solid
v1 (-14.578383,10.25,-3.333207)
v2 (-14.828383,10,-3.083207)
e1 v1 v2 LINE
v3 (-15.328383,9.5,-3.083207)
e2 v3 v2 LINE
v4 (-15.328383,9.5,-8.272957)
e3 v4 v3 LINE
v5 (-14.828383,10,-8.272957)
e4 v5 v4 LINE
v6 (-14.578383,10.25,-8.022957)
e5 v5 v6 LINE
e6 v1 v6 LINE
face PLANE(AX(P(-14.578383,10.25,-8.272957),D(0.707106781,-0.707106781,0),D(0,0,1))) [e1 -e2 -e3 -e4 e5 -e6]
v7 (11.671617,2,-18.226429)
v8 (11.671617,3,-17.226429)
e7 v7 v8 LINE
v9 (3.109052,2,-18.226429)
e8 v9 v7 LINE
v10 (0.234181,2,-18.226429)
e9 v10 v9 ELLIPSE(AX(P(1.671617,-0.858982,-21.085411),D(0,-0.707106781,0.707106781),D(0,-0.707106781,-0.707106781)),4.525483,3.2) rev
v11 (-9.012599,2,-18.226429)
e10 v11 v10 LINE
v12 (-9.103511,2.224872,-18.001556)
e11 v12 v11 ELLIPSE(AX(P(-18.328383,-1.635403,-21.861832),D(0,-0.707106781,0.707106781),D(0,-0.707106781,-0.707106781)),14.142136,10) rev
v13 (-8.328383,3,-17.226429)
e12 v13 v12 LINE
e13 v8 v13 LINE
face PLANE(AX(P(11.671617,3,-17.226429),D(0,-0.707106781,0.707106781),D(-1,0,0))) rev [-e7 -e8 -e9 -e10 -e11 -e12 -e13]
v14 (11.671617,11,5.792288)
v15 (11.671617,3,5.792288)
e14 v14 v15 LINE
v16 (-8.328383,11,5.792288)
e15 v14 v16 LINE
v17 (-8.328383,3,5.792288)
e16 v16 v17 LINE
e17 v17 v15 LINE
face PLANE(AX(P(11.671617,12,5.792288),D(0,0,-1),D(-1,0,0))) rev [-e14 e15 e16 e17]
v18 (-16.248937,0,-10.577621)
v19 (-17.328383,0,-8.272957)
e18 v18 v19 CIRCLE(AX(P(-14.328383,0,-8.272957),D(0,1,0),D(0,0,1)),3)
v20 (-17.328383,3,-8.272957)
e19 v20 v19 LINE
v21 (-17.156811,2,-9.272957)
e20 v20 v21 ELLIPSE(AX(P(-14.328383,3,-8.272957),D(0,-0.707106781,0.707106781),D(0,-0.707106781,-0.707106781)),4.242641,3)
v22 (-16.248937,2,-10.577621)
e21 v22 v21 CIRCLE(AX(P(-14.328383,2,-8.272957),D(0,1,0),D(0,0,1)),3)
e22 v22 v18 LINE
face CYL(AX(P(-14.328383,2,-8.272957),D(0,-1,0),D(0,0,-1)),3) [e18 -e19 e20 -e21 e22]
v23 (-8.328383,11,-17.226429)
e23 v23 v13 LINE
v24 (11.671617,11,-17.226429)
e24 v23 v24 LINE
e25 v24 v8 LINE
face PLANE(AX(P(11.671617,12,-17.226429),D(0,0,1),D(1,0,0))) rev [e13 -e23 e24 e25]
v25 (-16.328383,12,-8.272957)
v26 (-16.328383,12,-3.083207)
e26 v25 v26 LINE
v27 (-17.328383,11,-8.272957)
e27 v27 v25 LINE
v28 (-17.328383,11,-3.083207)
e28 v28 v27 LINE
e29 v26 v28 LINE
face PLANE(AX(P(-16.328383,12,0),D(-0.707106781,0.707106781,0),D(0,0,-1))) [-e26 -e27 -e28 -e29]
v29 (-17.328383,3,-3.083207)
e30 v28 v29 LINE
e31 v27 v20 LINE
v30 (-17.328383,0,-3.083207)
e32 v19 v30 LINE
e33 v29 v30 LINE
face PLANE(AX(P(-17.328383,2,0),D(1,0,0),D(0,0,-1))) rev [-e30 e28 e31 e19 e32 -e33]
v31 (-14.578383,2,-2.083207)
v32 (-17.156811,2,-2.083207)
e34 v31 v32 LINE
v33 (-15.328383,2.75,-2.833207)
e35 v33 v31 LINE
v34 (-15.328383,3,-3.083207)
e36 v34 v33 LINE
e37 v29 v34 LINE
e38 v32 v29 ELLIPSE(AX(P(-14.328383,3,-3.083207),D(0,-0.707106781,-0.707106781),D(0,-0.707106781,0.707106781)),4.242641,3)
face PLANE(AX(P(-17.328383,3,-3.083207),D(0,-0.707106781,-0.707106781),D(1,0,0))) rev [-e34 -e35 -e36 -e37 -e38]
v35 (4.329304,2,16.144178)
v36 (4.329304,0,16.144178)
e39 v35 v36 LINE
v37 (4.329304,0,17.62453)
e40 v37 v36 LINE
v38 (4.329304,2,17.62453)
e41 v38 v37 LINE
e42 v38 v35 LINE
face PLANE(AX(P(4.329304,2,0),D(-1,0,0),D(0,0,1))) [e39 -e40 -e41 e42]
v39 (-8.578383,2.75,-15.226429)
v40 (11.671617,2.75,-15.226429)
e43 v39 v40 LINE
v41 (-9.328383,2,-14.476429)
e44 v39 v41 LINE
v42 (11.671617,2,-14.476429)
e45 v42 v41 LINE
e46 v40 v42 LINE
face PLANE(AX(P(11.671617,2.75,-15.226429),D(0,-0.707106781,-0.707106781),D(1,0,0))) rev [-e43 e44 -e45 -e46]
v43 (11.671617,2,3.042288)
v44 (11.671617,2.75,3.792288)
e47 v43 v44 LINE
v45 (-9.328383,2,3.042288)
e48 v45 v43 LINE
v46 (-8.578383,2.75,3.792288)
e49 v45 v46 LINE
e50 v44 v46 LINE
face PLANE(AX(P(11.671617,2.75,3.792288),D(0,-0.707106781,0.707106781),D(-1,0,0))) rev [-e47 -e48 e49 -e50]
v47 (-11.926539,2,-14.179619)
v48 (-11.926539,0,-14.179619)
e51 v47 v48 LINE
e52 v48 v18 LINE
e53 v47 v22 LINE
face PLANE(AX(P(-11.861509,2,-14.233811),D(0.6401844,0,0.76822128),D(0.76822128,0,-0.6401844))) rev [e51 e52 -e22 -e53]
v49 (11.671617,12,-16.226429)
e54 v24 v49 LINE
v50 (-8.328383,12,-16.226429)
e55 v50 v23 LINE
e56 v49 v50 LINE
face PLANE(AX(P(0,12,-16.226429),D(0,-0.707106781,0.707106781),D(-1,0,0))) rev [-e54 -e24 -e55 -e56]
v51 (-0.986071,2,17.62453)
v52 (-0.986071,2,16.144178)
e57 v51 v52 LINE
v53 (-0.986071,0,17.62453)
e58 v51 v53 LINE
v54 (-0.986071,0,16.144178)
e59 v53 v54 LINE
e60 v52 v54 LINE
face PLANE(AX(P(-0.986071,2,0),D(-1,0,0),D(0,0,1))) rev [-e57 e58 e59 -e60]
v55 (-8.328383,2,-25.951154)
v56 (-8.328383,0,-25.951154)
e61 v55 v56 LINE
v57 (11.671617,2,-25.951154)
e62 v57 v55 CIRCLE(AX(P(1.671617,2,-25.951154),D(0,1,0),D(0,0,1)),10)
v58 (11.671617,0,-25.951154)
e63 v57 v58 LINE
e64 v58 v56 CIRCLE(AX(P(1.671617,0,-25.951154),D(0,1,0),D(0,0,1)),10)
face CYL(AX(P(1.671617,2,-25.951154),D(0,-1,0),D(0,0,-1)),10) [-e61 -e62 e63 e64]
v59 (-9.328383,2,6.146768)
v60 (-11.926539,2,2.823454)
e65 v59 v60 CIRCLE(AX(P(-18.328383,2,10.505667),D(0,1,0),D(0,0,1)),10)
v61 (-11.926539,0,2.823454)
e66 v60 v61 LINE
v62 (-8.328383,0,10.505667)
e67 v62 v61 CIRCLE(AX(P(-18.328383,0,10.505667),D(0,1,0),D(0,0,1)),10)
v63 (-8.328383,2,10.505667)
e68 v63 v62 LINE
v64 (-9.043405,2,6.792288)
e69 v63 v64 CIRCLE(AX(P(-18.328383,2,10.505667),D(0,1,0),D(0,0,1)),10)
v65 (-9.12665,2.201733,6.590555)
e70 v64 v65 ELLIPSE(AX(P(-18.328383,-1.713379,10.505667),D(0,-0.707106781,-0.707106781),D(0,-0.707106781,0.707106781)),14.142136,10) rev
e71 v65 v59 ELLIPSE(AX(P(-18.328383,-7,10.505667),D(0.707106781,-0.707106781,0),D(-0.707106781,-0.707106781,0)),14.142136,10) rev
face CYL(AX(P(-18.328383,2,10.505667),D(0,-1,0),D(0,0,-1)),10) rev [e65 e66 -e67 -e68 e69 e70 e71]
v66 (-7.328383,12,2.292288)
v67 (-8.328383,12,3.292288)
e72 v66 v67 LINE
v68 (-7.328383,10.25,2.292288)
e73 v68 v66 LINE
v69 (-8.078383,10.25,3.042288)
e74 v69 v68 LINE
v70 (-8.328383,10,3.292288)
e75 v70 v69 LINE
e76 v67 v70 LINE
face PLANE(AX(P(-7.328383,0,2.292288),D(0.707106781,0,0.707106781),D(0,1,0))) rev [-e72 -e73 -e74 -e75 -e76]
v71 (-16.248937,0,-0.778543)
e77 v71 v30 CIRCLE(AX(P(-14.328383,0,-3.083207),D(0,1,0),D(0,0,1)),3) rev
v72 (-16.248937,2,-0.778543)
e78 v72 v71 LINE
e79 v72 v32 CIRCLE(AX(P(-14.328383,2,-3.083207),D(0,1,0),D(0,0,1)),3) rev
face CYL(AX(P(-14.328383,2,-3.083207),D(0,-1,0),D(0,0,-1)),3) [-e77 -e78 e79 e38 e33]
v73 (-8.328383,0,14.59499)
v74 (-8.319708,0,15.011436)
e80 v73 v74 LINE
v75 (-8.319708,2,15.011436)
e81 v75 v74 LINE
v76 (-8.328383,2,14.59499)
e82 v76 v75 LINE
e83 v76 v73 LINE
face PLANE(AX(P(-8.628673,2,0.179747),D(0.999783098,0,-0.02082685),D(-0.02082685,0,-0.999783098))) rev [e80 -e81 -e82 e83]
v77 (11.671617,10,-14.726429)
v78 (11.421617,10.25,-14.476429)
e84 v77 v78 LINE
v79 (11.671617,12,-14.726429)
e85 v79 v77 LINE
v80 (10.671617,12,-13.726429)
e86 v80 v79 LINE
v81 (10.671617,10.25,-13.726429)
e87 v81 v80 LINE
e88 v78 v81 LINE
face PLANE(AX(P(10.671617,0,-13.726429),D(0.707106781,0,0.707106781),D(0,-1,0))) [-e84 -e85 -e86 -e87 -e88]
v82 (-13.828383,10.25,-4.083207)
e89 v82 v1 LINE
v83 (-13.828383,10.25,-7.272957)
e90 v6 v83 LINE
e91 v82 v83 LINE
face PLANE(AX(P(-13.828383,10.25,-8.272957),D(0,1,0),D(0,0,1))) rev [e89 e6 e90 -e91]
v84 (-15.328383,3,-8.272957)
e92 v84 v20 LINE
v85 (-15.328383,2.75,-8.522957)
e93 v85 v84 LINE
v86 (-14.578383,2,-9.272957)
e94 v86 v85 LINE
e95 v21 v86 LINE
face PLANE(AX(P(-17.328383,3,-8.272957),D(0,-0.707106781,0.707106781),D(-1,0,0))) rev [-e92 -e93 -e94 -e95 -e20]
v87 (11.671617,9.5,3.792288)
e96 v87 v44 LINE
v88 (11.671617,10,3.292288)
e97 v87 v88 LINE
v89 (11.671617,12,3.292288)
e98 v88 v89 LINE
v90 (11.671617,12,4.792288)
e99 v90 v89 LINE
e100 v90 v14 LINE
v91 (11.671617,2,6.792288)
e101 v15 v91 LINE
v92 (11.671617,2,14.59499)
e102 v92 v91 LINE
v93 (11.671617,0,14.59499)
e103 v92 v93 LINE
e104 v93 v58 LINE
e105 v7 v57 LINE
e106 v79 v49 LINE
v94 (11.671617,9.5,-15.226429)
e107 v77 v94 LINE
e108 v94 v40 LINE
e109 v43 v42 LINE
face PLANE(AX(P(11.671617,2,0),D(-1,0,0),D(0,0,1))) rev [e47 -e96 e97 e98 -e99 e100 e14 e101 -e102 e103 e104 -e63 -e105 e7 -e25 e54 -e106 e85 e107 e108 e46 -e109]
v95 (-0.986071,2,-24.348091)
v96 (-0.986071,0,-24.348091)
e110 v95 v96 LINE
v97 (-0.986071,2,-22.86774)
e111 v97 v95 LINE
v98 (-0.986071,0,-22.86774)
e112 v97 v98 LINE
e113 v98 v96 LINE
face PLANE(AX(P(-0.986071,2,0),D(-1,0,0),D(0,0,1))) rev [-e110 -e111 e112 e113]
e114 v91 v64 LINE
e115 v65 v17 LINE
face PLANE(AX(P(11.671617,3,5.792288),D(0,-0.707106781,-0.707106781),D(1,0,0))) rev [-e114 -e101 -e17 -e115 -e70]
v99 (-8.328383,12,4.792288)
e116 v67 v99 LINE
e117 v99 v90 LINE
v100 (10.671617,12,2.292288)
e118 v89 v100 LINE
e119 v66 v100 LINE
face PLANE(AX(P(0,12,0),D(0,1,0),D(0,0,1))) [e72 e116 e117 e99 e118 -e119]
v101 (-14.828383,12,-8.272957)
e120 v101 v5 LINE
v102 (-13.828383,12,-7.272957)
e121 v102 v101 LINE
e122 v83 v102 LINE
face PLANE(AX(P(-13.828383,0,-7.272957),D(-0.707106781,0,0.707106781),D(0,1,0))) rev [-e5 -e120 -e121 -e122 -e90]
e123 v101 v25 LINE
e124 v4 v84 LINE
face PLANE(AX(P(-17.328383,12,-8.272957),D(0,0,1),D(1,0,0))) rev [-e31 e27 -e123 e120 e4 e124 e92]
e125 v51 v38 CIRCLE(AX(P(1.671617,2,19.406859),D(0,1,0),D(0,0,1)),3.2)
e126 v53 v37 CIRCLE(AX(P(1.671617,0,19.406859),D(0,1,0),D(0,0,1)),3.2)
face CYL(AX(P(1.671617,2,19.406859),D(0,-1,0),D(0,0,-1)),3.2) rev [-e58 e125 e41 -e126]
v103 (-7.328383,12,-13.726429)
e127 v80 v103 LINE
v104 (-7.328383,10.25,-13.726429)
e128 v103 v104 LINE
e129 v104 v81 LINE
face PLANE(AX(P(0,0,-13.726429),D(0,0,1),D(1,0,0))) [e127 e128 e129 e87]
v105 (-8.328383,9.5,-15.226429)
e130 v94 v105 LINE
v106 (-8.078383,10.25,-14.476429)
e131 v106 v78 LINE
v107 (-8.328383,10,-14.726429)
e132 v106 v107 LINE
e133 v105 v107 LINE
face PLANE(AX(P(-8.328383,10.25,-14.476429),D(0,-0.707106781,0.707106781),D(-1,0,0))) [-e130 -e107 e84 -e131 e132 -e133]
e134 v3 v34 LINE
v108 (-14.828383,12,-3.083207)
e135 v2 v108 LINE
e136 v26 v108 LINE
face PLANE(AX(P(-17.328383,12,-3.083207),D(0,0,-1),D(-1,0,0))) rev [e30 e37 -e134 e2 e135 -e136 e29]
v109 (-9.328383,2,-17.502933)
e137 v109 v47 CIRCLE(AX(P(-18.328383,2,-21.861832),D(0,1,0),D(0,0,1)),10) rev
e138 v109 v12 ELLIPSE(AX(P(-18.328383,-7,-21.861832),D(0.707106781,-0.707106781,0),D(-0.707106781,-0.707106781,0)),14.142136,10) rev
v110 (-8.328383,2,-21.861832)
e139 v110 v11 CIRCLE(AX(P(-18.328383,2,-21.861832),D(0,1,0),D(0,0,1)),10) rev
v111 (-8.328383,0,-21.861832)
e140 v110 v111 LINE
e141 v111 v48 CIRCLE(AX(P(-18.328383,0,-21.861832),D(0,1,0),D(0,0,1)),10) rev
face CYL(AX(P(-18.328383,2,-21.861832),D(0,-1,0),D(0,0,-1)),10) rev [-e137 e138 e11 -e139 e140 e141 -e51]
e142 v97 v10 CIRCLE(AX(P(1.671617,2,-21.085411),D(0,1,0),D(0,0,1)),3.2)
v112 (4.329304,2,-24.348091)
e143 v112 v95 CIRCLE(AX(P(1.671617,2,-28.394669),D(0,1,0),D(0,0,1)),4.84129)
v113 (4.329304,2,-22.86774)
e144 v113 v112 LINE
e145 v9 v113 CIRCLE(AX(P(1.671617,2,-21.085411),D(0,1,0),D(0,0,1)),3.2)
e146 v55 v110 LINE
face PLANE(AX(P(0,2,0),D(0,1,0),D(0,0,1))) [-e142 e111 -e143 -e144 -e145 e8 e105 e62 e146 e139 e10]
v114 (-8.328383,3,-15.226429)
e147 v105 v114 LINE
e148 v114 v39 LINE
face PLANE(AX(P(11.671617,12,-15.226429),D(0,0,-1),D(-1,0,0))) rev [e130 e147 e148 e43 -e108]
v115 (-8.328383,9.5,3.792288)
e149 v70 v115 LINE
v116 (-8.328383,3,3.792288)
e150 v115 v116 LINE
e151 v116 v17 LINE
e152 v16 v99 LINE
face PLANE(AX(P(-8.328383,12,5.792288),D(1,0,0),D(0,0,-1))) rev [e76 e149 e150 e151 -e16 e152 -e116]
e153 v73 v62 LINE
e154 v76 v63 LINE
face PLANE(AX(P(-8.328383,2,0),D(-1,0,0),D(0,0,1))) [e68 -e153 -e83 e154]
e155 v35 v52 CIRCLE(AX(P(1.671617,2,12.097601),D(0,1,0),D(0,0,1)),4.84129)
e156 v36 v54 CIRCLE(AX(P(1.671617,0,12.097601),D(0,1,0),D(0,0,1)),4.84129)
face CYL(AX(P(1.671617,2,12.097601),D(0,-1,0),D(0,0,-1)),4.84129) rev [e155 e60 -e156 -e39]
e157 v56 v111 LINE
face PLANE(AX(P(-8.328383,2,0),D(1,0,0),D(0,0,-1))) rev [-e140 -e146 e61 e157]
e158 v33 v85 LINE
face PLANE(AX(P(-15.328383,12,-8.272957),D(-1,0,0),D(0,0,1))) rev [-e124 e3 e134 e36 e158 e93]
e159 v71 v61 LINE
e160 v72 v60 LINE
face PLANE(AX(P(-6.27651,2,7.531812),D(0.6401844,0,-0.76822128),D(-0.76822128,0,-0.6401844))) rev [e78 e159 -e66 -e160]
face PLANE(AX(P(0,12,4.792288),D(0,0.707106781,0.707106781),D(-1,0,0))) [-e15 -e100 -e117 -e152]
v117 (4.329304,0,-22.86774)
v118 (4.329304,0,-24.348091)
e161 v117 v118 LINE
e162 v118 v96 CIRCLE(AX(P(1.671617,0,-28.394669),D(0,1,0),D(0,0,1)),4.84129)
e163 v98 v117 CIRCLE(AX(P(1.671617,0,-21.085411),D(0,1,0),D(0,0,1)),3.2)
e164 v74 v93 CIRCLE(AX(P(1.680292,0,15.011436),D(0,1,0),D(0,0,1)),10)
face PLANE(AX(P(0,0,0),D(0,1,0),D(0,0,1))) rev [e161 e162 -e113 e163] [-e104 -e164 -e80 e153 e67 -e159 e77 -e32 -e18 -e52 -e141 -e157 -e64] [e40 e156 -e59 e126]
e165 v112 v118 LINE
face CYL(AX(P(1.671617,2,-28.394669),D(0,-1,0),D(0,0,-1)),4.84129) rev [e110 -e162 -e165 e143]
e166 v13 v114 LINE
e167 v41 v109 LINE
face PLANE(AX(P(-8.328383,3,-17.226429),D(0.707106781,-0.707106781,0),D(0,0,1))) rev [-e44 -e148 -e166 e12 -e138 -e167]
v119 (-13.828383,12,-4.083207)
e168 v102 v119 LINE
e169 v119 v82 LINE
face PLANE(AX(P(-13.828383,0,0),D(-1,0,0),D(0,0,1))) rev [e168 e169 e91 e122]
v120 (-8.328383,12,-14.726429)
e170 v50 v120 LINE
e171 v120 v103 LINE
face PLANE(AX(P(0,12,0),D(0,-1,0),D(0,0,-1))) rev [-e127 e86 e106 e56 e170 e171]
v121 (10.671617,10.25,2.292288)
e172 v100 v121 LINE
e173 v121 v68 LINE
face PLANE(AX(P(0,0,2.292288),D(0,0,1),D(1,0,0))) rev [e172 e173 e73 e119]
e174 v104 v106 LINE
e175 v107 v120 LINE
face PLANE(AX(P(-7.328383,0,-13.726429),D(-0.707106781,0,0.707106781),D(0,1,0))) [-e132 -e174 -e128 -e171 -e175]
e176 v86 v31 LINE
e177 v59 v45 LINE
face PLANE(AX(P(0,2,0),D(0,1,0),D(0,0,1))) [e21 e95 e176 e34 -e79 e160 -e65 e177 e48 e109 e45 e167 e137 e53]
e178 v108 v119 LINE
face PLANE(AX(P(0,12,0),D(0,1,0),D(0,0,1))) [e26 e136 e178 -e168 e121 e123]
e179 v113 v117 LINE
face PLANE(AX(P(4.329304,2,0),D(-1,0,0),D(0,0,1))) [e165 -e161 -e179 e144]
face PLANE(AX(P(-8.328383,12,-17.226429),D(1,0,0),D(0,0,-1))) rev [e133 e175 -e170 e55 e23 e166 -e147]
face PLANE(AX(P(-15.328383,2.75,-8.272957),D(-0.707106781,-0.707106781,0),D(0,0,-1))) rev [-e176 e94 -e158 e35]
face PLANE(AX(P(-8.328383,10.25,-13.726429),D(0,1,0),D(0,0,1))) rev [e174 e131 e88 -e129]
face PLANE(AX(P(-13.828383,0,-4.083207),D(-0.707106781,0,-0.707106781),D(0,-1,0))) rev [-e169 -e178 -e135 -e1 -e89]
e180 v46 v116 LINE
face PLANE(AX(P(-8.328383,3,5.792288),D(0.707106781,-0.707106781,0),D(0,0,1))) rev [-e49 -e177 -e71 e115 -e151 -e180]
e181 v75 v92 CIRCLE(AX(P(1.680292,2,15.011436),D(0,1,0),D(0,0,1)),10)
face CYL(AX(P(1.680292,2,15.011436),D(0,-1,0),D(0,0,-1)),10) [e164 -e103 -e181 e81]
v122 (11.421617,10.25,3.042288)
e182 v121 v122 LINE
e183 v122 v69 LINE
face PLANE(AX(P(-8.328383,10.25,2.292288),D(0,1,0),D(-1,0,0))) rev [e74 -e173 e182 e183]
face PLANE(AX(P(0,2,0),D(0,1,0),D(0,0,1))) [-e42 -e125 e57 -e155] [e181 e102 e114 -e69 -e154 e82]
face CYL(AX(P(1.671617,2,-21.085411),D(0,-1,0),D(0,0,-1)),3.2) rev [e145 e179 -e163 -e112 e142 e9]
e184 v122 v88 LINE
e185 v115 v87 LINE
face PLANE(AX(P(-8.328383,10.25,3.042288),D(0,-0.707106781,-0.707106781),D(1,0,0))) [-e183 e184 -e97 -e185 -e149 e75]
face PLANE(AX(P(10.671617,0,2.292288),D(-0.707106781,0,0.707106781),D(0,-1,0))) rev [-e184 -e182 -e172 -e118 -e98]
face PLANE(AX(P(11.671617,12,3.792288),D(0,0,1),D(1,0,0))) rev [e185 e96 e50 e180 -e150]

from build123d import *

# Parameters (mm, degrees)
BOSS_EXTRUDE3_DEPTH = 2
SKETCH2_W           = 2
SKETCH2_H           = 5.189750324
SKETCH2_W_2         = 20
SKETCH2_H_2         = 2
BOSS_EXTRUDE4_DEPTH = 10
SKETCH3_W           = 5.189750324
SKETCH3_H           = 1.75
BOSS_EXTRUDE5_DEPTH = 1.5
SKETCH4_W           = 20
SKETCH4_H           = 1.75
BOSS_EXTRUDE6_DEPTH = 1.5
SKETCH5_W           = 20
SKETCH5_H           = 1.75
BOSS_EXTRUDE7_DEPTH = 1.5
CHAMFER1_SIZE       = 0.75
CHAMFER2_SIZE       = 1


with BuildPart() as part:
    # Sketch1 → Boss-Extrude3 (new body)
    with BuildSketch(Plane(origin=(0, 0, 0), x_dir=(1, 0, 0), z_dir=(0, 1, 0))):
        with BuildLine():
            Line((-11.926539406, 14.179618856), (-16.248936601, 10.577621193))
            ThreePointArc((-16.248936601, 10.577621193), (-17.045151666, 9.545423543), (-17.328383402, 8.272957354))
            Line((-17.328383402, 8.272957354), (-17.328383402, 3.08320703))
            ThreePointArc((-17.328383402, 3.08320703), (-17.045151666, 1.810740841), (-16.248936601, 0.778543191))
            Line((-16.248936601, 0.778543191), (-11.926539406, -2.823454472))
            ThreePointArc((-11.926539406, -2.823454472), (-9.27248919, -6.264113306), (-8.328383402, -10.505667268))
            Line((-8.328383402, -10.505667268), (-8.328383402, -14.594989625))
            Line((-8.328383402, -14.594989625), (-8.319708249, -15.011436268))
            ThreePointArc((-8.319708249, -15.011436268), (1.888560246, -25.009267244), (11.671616598, -14.594989625))
            Line((11.671616598, -14.594989625), (11.671616598, -5.821917808))
            Line((11.671616598, -5.821917808), (11.671616598, 17.178082192))
            Line((11.671616598, 17.178082192), (11.671616598, 25.951154008))
            ThreePointArc((11.671616598, 25.951154008), (1.671616598, 35.951154008), (-8.328383402, 25.951154008))
            Line((-8.328383402, 25.951154008), (-8.328383402, 21.861831652))
            ThreePointArc((-8.328383402, 21.861831652), (-9.27248919, 17.620277689), (-11.926539406, 14.179618856))
        make_face()
        with BuildLine():
            ThreePointArc((4.32930425, -16.144178085), (1.671616598, -7.256310151), (-0.986071055, -16.144178085))
            Line((-0.986071055, -16.144178085), (-0.986071055, -17.62452967))
            ThreePointArc((-0.986071055, -17.62452967), (1.671616598, -22.60685858), (4.32930425, -17.62452967))
            Line((4.32930425, -17.62452967), (4.32930425, -16.144178085))
        make_face(mode=Mode.SUBTRACT)
        with BuildLine():
            ThreePointArc((-0.986071055, 22.867739584), (1.671616598, 17.885410674), (4.32930425, 22.867739584))
            Line((4.32930425, 22.867739584), (4.32930425, 24.348091169))
            ThreePointArc((4.32930425, 24.348091169), (1.671616598, 33.235959102), (-0.986071055, 24.348091169))
            Line((-0.986071055, 24.348091169), (-0.986071055, 22.867739584))
        make_face(mode=Mode.SUBTRACT)
    extrude(amount=BOSS_EXTRUDE3_DEPTH)

    # Sketch2 → Boss-Extrude4 (add)
    with BuildSketch(Plane(origin=(0, 2, 0), x_dir=(1, 0, 0), z_dir=(0, 1, 0))):
        with Locations((-16.328383402, 5.678082192)):
            Rectangle(SKETCH2_W, SKETCH2_H)
        with Locations((1.671616598, 16.226428568)):
            Rectangle(SKETCH2_W_2, SKETCH2_H_2)
        with Locations((1.671616598, -4.792288058)):
            Rectangle(SKETCH2_W_2, SKETCH2_H_2)
    extrude(amount=BOSS_EXTRUDE4_DEPTH)

    # Sketch3 → Boss-Extrude5 (add)
    with BuildSketch(Plane(origin=(-15.328383402, 0, 0), x_dir=(0, 0, -1), z_dir=(1, 0, 0))):
        with Locations((5.678082192, 11.125)):
            Rectangle(SKETCH3_W, SKETCH3_H)
    extrude(amount=BOSS_EXTRUDE5_DEPTH)

    # Sketch4 → Boss-Extrude6 (add)
    with BuildSketch(Plane.XY.offset(-15.226428568)):
        with Locations((1.671616598, 11.125)):
            Rectangle(SKETCH4_W, SKETCH4_H)
    extrude(amount=BOSS_EXTRUDE6_DEPTH)

    # Sketch5 → Boss-Extrude7 (add)
    with BuildSketch(Plane(origin=(0, 0, 3.792288058), x_dir=(-1, 0, 0), z_dir=(0, 0, -1))):
        with Locations((-1.671616598, 11.125)):
            Rectangle(SKETCH5_W, SKETCH5_H)
    extrude(amount=BOSS_EXTRUDE7_DEPTH)

    # Chamfer1
    chamfer1_edges = [part.edges().sort_by_distance(p)[0] for p in [
        (-15.328383402, 10.25, -5.678082192),
        (1.671616598, 10.25, -15.226428568),
        (1.671616598, 10.25, 3.792288058),
        (-15.328383402, 2, -5.678082192),
        (1.671616598, 2, -15.226428568),
        (1.671616598, 2, 3.792288058),
    ]]
    chamfer(chamfer1_edges, length=CHAMFER1_SIZE)

    # Chamfer2
    # the kernel refuses this chamfer: 1 mm, written as the material it adds along each edge
    with BuildSketch(Plane(origin=(-12.006700414, 2, -3.08320703), x_dir=(0, 0, 1), z_dir=(-1, 0, 0))) as chamfer2_piece_1_section:
        Polygon((CHAMFER2_SIZE, 0), (0, CHAMFER2_SIZE), (0, 0), align=None)
    chamfer2_piece_1 = extrude(amount=7.893365976, mode=Mode.PRIVATE)
    chamfer2_piece_1 = split(chamfer2_piece_1, bisect_by=Plane(origin=(-15.328383402, 2, -3.08320703), z_dir=(-1, 0, 0)), keep=Keep.TOP, mode=Mode.PRIVATE)
    chamfer2_piece_1 = chamfer2_piece_1 & Plane(origin=(-14.328383402, 2, -3.08320703), x_dir=(-1, 0, 0), z_dir=(0, -1, 0)) * Cylinder(3, 20, mode=Mode.PRIVATE)
    add(chamfer2_piece_1)
    with BuildSketch(Plane(origin=(-12.006700414, 2, -3.08320703), x_dir=(0, 0, 1), z_dir=(-1, 0, 0))) as chamfer2_piece_2_section:
        Polygon((CHAMFER2_SIZE, 0), (0, CHAMFER2_SIZE), (0, 0), align=None)
    chamfer2_piece_2 = extrude(amount=7.893365976, mode=Mode.PRIVATE)
    chamfer2_piece_2 = split(chamfer2_piece_2, bisect_by=Plane(origin=(-15.328383402, 2, -3.08320703), z_dir=(1, 0, 0)), keep=Keep.TOP, mode=Mode.PRIVATE)
    chamfer2_piece_2 = split(chamfer2_piece_2, bisect_by=Plane(origin=(-13.292541908, 0.714158506, -3.08320703), z_dir=(-0.7071067811865476, -0.7071067811865476, 0)), keep=Keep.TOP, mode=Mode.PRIVATE)
    add(chamfer2_piece_2)
    with BuildSketch(Plane(origin=(-19.90006639, 2, -8.272957354), x_dir=(0, 0, -1), z_dir=(1, 0, 0))) as chamfer2_piece_3_section:
        Polygon((CHAMFER2_SIZE, 0), (0, CHAMFER2_SIZE), (0, 0), align=None)
    chamfer2_piece_3 = extrude(amount=7.893365976, mode=Mode.PRIVATE)
    chamfer2_piece_3 = split(chamfer2_piece_3, bisect_by=Plane(origin=(-17.239224896, 4.660841494, -8.272957354), z_dir=(-0.7071067811865476, -0.7071067811865476, 0)), keep=Keep.TOP, mode=Mode.PRIVATE)
    chamfer2_piece_3 = chamfer2_piece_3 & Plane(origin=(-14.328383402, 2, -8.272957354), x_dir=(-0.6401843996644775, 0, -0.7682212795973778), z_dir=(0, -1, 0)) * Cylinder(3, 20, mode=Mode.PRIVATE)
    add(chamfer2_piece_3)
    with BuildSketch(Plane(origin=(-19.90006639, 2, -8.272957354), x_dir=(0, 0, -1), z_dir=(1, 0, 0))) as chamfer2_piece_4_section:
        Polygon((CHAMFER2_SIZE, 0), (0, CHAMFER2_SIZE), (0, 0), align=None)
    chamfer2_piece_4 = extrude(amount=7.893365976, mode=Mode.PRIVATE)
    chamfer2_piece_4 = split(chamfer2_piece_4, bisect_by=Plane(origin=(-15.328383402, 2, -8.272957354), z_dir=(-1, 0, 0)), keep=Keep.TOP, mode=Mode.PRIVATE)
    chamfer2_piece_4 = split(chamfer2_piece_4, bisect_by=Plane(origin=(-17.239224896, 4.660841494, -8.272957354), z_dir=(0.7071067811865476, 0.7071067811865476, 0)), keep=Keep.TOP, mode=Mode.PRIVATE)
    add(chamfer2_piece_4)
    with BuildSketch(Plane(origin=(-8.328383402, 2, -11.90474558), x_dir=(-1, 0, 0), z_dir=(0, 0, -1))) as chamfer2_piece_5_section:
        Polygon((CHAMFER2_SIZE, 0), (0, CHAMFER2_SIZE), (0, 0), align=None)
    chamfer2_piece_5 = extrude(amount=5.321682988, mode=Mode.PRIVATE)
    chamfer2_piece_5 = split(chamfer2_piece_5, bisect_by=Plane(origin=(-8.328383402, 2, -15.226428568), z_dir=(0, 0, -1)), keep=Keep.TOP, mode=Mode.PRIVATE)
    add(chamfer2_piece_5)
    with BuildSketch(Plane(origin=(-8.328383402, 2, -11.90474558), x_dir=(-1, 0, 0), z_dir=(0, 0, -1))) as chamfer2_piece_6_section:
        Polygon((CHAMFER2_SIZE, 0), (0, CHAMFER2_SIZE), (0, 0), align=None)
    chamfer2_piece_6 = extrude(amount=7.893365976, mode=Mode.PRIVATE)
    chamfer2_piece_6 = split(chamfer2_piece_6, bisect_by=Plane(origin=(-8.328383402, 2, -15.226428568), z_dir=(0, 0, 1)), keep=Keep.TOP, mode=Mode.PRIVATE)
    chamfer2_piece_6 = split(chamfer2_piece_6, bisect_by=Plane(origin=(-8.328383402, 0.714158506, -13.190587074), z_dir=(0, -0.7071067811865476, -0.7071067811865476)), keep=Keep.TOP, mode=Mode.PRIVATE)
    add(chamfer2_piece_6)
    with BuildSketch(Plane(origin=(11.671616598, 2, -17.226428568), x_dir=(0, 0, -1), z_dir=(-1, 0, 0))) as chamfer2_piece_7_section:
        Polygon((CHAMFER2_SIZE, 0), (0, -CHAMFER2_SIZE), (0, 0), align=None)
    chamfer2_piece_7 = extrude(amount=20, mode=Mode.PRIVATE)
    chamfer2_piece_7 = chamfer2_piece_7 - Plane(origin=(1.671616598, 2, -21.085410674), x_dir=(-0.8305273914033934, 0, -0.5569777842326162), z_dir=(0, -1, 0)) * Cylinder(3.2, 44, mode=Mode.PRIVATE)
    add(chamfer2_piece_7)
    with BuildSketch(Plane(origin=(-8.328383402, 2, 5.792288058), x_dir=(-1, 0, 0), z_dir=(0, 0, -1))) as chamfer2_piece_8_section:
        Polygon((CHAMFER2_SIZE, 0), (0, CHAMFER2_SIZE), (0, 0), align=None)
    chamfer2_piece_8 = extrude(amount=5.321682988, mode=Mode.PRIVATE)
    chamfer2_piece_8 = split(chamfer2_piece_8, bisect_by=Plane(origin=(-8.328383402, 2, 3.792288058), z_dir=(0, 0, 1)), keep=Keep.TOP, mode=Mode.PRIVATE)
    add(chamfer2_piece_8)
    with BuildSketch(Plane(origin=(-8.328383402, 2, 5.792288058), x_dir=(-1, 0, 0), z_dir=(0, 0, -1))) as chamfer2_piece_9_section:
        Polygon((CHAMFER2_SIZE, 0), (0, CHAMFER2_SIZE), (0, 0), align=None)
    chamfer2_piece_9 = extrude(amount=5.321682988, mode=Mode.PRIVATE)
    chamfer2_piece_9 = split(chamfer2_piece_9, bisect_by=Plane(origin=(-8.328383402, 3.375, 4.417288058), z_dir=(0, -0.7071067811865476, 0.7071067811865476)), keep=Keep.TOP, mode=Mode.PRIVATE)
    add(chamfer2_piece_9)
    with BuildSketch(Plane(origin=(11.671616598, 2, 5.792288058), x_dir=(0, 0, 1), z_dir=(-1, 0, 0))) as chamfer2_piece_10:
        Polygon((CHAMFER2_SIZE, 0), (0, CHAMFER2_SIZE), (0, 0), align=None)
    extrude(amount=20)
    with BuildSketch(Plane(origin=(-8.328383402, 2, -11.90474558), x_dir=(-1, 0, 0), z_dir=(0, 0, -1))) as chamfer2_piece_11a_section:
        Polygon((CHAMFER2_SIZE, 0), (0, CHAMFER2_SIZE), (0, 0), align=None)
    chamfer2_piece_11a = extrude(amount=7.893365976, mode=Mode.PRIVATE)
    chamfer2_piece_11a = chamfer2_piece_11a - Plane(origin=(-18.328383402, 2, -21.861831652), x_dir=(1, 0, 0), z_dir=(0, -1, 0)) * Cylinder(10, 20, mode=Mode.PRIVATE)
    chamfer2_piece_11a = split(chamfer2_piece_11a, bisect_by=Plane(origin=(-8.328383402, 2, -17.226428568), z_dir=(0, 0, -1)), keep=Keep.TOP, mode=Mode.PRIVATE)
    with BuildSketch(Plane(origin=(11.671616598, 2, -17.226428568), x_dir=(0, 0, -1), z_dir=(-1, 0, 0))) as chamfer2_piece_11b_section:
        Polygon((CHAMFER2_SIZE, 0), (0, -CHAMFER2_SIZE), (0, 0), align=None)
    chamfer2_piece_11b = extrude(amount=22.571682988, mode=Mode.PRIVATE)
    chamfer2_piece_11b = chamfer2_piece_11b - Plane(origin=(-18.328383402, 2, -21.861831652), x_dir=(1, 0, 0), z_dir=(0, -1, 0)) * Cylinder(10, 50, mode=Mode.PRIVATE)
    chamfer2_piece_11b = split(chamfer2_piece_11b, bisect_by=Plane(origin=(-8.328383402, 2, -17.226428568), z_dir=(-1, 0, 0)), keep=Keep.TOP, mode=Mode.PRIVATE)
    chamfer2_piece_11 = chamfer2_piece_11a & chamfer2_piece_11b
    add(chamfer2_piece_11)
    with BuildSketch(Plane(origin=(11.671616598, 2, 5.792288058), x_dir=(0, 0, 1), z_dir=(-1, 0, 0))) as chamfer2_piece_12a_section:
        Polygon((CHAMFER2_SIZE, 0), (0, CHAMFER2_SIZE), (0, 0), align=None)
    chamfer2_piece_12a = extrude(amount=22.571682988, mode=Mode.PRIVATE)
    chamfer2_piece_12a = split(chamfer2_piece_12a, bisect_by=Plane(origin=(-8.328383402, 2, 5.792288058), z_dir=(-1, 0, 0)), keep=Keep.TOP, mode=Mode.PRIVATE)
    chamfer2_piece_12a = chamfer2_piece_12a - Plane(origin=(-18.328383402, 2, 10.505667268), x_dir=(0.6401843996644763, 0, -0.7682212795973788), z_dir=(0, -1, 0)) * Cylinder(10, 50, mode=Mode.PRIVATE)
    with BuildSketch(Plane(origin=(-8.328383402, 2, 8.363971046), x_dir=(-1, 0, 0), z_dir=(0, 0, -1))) as chamfer2_piece_12b_section:
        Polygon((CHAMFER2_SIZE, 0), (0, CHAMFER2_SIZE), (0, 0), align=None)
    chamfer2_piece_12b = extrude(amount=7.893365976, mode=Mode.PRIVATE)
    chamfer2_piece_12b = split(chamfer2_piece_12b, bisect_by=Plane(origin=(-8.328383402, 2, 5.792288058), z_dir=(0, 0, 1)), keep=Keep.TOP, mode=Mode.PRIVATE)
    chamfer2_piece_12b = chamfer2_piece_12b - Plane(origin=(-18.328383402, 2, 10.505667268), x_dir=(0.6401843996644763, 0, -0.7682212795973788), z_dir=(0, -1, 0)) * Cylinder(10, 20, mode=Mode.PRIVATE)
    chamfer2_piece_12 = chamfer2_piece_12a & chamfer2_piece_12b
    add(chamfer2_piece_12)
    # the kernel refuses this chamfer: 1 mm, written as the material it takes off along each edge
    with BuildSketch(Plane(origin=(11.671616598, 14.571682988, 2.292288058), x_dir=(-1, 0, 0), z_dir=(0, -1, 0)), Plane(origin=(-13.828383402, 7.678317012, -8.272957354), x_dir=(0, 0, 1), z_dir=(0, 1, 0)), Plane(origin=(-8.328383402, 7.678317012, 2.292288058), x_dir=(1, 0, 0), z_dir=(0, 1, 0))) as chamfer2_2_piece_1:
        Polygon((CHAMFER2_SIZE, 0), (0, -CHAMFER2_SIZE), (0, 0), align=None)
    extrude(amount=6.893365976, mode=Mode.SUBTRACT)
    with BuildSketch(Plane(origin=(11.671616598, 14.571682988, -13.726428568), x_dir=(-1, 0, 0), z_dir=(0, -1, 0)), Plane(origin=(-8.328383402, 7.678317012, -13.726428568), x_dir=(1, 0, 0), z_dir=(0, 1, 0)), Plane(origin=(-13.828383402, 14.571682988, -3.08320703), x_dir=(-1, 0, 0), z_dir=(0, -1, 0))) as chamfer2_2_piece_2:
        Polygon((CHAMFER2_SIZE, 0), (0, CHAMFER2_SIZE), (0, 0), align=None)
    extrude(amount=6.893365976, mode=Mode.SUBTRACT)
    with BuildSketch(Plane(origin=(14.243299586, 12, -17.226428568), x_dir=(0, -1, 0), z_dir=(-1, 0, 0)), Plane(origin=(14.243299586, 12, 5.792288058), x_dir=(0, 0, -1), z_dir=(-1, 0, 0))) as chamfer2_2_piece_3:
        Polygon((CHAMFER2_SIZE, 0), (0, CHAMFER2_SIZE), (0, 0), align=None)
    extrude(amount=25.143365976, mode=Mode.SUBTRACT)
    with BuildSketch(Plane(origin=(-17.328383402, 12, -0.511524042), x_dir=(0, -1, 0), z_dir=(0, 0, -1))) as chamfer2_2_piece_4:
        Polygon((CHAMFER2_SIZE, 0), (0, -CHAMFER2_SIZE), (0, 0), align=None)
    extrude(amount=10.3331163, mode=Mode.SUBTRACT)


solid = part.part
